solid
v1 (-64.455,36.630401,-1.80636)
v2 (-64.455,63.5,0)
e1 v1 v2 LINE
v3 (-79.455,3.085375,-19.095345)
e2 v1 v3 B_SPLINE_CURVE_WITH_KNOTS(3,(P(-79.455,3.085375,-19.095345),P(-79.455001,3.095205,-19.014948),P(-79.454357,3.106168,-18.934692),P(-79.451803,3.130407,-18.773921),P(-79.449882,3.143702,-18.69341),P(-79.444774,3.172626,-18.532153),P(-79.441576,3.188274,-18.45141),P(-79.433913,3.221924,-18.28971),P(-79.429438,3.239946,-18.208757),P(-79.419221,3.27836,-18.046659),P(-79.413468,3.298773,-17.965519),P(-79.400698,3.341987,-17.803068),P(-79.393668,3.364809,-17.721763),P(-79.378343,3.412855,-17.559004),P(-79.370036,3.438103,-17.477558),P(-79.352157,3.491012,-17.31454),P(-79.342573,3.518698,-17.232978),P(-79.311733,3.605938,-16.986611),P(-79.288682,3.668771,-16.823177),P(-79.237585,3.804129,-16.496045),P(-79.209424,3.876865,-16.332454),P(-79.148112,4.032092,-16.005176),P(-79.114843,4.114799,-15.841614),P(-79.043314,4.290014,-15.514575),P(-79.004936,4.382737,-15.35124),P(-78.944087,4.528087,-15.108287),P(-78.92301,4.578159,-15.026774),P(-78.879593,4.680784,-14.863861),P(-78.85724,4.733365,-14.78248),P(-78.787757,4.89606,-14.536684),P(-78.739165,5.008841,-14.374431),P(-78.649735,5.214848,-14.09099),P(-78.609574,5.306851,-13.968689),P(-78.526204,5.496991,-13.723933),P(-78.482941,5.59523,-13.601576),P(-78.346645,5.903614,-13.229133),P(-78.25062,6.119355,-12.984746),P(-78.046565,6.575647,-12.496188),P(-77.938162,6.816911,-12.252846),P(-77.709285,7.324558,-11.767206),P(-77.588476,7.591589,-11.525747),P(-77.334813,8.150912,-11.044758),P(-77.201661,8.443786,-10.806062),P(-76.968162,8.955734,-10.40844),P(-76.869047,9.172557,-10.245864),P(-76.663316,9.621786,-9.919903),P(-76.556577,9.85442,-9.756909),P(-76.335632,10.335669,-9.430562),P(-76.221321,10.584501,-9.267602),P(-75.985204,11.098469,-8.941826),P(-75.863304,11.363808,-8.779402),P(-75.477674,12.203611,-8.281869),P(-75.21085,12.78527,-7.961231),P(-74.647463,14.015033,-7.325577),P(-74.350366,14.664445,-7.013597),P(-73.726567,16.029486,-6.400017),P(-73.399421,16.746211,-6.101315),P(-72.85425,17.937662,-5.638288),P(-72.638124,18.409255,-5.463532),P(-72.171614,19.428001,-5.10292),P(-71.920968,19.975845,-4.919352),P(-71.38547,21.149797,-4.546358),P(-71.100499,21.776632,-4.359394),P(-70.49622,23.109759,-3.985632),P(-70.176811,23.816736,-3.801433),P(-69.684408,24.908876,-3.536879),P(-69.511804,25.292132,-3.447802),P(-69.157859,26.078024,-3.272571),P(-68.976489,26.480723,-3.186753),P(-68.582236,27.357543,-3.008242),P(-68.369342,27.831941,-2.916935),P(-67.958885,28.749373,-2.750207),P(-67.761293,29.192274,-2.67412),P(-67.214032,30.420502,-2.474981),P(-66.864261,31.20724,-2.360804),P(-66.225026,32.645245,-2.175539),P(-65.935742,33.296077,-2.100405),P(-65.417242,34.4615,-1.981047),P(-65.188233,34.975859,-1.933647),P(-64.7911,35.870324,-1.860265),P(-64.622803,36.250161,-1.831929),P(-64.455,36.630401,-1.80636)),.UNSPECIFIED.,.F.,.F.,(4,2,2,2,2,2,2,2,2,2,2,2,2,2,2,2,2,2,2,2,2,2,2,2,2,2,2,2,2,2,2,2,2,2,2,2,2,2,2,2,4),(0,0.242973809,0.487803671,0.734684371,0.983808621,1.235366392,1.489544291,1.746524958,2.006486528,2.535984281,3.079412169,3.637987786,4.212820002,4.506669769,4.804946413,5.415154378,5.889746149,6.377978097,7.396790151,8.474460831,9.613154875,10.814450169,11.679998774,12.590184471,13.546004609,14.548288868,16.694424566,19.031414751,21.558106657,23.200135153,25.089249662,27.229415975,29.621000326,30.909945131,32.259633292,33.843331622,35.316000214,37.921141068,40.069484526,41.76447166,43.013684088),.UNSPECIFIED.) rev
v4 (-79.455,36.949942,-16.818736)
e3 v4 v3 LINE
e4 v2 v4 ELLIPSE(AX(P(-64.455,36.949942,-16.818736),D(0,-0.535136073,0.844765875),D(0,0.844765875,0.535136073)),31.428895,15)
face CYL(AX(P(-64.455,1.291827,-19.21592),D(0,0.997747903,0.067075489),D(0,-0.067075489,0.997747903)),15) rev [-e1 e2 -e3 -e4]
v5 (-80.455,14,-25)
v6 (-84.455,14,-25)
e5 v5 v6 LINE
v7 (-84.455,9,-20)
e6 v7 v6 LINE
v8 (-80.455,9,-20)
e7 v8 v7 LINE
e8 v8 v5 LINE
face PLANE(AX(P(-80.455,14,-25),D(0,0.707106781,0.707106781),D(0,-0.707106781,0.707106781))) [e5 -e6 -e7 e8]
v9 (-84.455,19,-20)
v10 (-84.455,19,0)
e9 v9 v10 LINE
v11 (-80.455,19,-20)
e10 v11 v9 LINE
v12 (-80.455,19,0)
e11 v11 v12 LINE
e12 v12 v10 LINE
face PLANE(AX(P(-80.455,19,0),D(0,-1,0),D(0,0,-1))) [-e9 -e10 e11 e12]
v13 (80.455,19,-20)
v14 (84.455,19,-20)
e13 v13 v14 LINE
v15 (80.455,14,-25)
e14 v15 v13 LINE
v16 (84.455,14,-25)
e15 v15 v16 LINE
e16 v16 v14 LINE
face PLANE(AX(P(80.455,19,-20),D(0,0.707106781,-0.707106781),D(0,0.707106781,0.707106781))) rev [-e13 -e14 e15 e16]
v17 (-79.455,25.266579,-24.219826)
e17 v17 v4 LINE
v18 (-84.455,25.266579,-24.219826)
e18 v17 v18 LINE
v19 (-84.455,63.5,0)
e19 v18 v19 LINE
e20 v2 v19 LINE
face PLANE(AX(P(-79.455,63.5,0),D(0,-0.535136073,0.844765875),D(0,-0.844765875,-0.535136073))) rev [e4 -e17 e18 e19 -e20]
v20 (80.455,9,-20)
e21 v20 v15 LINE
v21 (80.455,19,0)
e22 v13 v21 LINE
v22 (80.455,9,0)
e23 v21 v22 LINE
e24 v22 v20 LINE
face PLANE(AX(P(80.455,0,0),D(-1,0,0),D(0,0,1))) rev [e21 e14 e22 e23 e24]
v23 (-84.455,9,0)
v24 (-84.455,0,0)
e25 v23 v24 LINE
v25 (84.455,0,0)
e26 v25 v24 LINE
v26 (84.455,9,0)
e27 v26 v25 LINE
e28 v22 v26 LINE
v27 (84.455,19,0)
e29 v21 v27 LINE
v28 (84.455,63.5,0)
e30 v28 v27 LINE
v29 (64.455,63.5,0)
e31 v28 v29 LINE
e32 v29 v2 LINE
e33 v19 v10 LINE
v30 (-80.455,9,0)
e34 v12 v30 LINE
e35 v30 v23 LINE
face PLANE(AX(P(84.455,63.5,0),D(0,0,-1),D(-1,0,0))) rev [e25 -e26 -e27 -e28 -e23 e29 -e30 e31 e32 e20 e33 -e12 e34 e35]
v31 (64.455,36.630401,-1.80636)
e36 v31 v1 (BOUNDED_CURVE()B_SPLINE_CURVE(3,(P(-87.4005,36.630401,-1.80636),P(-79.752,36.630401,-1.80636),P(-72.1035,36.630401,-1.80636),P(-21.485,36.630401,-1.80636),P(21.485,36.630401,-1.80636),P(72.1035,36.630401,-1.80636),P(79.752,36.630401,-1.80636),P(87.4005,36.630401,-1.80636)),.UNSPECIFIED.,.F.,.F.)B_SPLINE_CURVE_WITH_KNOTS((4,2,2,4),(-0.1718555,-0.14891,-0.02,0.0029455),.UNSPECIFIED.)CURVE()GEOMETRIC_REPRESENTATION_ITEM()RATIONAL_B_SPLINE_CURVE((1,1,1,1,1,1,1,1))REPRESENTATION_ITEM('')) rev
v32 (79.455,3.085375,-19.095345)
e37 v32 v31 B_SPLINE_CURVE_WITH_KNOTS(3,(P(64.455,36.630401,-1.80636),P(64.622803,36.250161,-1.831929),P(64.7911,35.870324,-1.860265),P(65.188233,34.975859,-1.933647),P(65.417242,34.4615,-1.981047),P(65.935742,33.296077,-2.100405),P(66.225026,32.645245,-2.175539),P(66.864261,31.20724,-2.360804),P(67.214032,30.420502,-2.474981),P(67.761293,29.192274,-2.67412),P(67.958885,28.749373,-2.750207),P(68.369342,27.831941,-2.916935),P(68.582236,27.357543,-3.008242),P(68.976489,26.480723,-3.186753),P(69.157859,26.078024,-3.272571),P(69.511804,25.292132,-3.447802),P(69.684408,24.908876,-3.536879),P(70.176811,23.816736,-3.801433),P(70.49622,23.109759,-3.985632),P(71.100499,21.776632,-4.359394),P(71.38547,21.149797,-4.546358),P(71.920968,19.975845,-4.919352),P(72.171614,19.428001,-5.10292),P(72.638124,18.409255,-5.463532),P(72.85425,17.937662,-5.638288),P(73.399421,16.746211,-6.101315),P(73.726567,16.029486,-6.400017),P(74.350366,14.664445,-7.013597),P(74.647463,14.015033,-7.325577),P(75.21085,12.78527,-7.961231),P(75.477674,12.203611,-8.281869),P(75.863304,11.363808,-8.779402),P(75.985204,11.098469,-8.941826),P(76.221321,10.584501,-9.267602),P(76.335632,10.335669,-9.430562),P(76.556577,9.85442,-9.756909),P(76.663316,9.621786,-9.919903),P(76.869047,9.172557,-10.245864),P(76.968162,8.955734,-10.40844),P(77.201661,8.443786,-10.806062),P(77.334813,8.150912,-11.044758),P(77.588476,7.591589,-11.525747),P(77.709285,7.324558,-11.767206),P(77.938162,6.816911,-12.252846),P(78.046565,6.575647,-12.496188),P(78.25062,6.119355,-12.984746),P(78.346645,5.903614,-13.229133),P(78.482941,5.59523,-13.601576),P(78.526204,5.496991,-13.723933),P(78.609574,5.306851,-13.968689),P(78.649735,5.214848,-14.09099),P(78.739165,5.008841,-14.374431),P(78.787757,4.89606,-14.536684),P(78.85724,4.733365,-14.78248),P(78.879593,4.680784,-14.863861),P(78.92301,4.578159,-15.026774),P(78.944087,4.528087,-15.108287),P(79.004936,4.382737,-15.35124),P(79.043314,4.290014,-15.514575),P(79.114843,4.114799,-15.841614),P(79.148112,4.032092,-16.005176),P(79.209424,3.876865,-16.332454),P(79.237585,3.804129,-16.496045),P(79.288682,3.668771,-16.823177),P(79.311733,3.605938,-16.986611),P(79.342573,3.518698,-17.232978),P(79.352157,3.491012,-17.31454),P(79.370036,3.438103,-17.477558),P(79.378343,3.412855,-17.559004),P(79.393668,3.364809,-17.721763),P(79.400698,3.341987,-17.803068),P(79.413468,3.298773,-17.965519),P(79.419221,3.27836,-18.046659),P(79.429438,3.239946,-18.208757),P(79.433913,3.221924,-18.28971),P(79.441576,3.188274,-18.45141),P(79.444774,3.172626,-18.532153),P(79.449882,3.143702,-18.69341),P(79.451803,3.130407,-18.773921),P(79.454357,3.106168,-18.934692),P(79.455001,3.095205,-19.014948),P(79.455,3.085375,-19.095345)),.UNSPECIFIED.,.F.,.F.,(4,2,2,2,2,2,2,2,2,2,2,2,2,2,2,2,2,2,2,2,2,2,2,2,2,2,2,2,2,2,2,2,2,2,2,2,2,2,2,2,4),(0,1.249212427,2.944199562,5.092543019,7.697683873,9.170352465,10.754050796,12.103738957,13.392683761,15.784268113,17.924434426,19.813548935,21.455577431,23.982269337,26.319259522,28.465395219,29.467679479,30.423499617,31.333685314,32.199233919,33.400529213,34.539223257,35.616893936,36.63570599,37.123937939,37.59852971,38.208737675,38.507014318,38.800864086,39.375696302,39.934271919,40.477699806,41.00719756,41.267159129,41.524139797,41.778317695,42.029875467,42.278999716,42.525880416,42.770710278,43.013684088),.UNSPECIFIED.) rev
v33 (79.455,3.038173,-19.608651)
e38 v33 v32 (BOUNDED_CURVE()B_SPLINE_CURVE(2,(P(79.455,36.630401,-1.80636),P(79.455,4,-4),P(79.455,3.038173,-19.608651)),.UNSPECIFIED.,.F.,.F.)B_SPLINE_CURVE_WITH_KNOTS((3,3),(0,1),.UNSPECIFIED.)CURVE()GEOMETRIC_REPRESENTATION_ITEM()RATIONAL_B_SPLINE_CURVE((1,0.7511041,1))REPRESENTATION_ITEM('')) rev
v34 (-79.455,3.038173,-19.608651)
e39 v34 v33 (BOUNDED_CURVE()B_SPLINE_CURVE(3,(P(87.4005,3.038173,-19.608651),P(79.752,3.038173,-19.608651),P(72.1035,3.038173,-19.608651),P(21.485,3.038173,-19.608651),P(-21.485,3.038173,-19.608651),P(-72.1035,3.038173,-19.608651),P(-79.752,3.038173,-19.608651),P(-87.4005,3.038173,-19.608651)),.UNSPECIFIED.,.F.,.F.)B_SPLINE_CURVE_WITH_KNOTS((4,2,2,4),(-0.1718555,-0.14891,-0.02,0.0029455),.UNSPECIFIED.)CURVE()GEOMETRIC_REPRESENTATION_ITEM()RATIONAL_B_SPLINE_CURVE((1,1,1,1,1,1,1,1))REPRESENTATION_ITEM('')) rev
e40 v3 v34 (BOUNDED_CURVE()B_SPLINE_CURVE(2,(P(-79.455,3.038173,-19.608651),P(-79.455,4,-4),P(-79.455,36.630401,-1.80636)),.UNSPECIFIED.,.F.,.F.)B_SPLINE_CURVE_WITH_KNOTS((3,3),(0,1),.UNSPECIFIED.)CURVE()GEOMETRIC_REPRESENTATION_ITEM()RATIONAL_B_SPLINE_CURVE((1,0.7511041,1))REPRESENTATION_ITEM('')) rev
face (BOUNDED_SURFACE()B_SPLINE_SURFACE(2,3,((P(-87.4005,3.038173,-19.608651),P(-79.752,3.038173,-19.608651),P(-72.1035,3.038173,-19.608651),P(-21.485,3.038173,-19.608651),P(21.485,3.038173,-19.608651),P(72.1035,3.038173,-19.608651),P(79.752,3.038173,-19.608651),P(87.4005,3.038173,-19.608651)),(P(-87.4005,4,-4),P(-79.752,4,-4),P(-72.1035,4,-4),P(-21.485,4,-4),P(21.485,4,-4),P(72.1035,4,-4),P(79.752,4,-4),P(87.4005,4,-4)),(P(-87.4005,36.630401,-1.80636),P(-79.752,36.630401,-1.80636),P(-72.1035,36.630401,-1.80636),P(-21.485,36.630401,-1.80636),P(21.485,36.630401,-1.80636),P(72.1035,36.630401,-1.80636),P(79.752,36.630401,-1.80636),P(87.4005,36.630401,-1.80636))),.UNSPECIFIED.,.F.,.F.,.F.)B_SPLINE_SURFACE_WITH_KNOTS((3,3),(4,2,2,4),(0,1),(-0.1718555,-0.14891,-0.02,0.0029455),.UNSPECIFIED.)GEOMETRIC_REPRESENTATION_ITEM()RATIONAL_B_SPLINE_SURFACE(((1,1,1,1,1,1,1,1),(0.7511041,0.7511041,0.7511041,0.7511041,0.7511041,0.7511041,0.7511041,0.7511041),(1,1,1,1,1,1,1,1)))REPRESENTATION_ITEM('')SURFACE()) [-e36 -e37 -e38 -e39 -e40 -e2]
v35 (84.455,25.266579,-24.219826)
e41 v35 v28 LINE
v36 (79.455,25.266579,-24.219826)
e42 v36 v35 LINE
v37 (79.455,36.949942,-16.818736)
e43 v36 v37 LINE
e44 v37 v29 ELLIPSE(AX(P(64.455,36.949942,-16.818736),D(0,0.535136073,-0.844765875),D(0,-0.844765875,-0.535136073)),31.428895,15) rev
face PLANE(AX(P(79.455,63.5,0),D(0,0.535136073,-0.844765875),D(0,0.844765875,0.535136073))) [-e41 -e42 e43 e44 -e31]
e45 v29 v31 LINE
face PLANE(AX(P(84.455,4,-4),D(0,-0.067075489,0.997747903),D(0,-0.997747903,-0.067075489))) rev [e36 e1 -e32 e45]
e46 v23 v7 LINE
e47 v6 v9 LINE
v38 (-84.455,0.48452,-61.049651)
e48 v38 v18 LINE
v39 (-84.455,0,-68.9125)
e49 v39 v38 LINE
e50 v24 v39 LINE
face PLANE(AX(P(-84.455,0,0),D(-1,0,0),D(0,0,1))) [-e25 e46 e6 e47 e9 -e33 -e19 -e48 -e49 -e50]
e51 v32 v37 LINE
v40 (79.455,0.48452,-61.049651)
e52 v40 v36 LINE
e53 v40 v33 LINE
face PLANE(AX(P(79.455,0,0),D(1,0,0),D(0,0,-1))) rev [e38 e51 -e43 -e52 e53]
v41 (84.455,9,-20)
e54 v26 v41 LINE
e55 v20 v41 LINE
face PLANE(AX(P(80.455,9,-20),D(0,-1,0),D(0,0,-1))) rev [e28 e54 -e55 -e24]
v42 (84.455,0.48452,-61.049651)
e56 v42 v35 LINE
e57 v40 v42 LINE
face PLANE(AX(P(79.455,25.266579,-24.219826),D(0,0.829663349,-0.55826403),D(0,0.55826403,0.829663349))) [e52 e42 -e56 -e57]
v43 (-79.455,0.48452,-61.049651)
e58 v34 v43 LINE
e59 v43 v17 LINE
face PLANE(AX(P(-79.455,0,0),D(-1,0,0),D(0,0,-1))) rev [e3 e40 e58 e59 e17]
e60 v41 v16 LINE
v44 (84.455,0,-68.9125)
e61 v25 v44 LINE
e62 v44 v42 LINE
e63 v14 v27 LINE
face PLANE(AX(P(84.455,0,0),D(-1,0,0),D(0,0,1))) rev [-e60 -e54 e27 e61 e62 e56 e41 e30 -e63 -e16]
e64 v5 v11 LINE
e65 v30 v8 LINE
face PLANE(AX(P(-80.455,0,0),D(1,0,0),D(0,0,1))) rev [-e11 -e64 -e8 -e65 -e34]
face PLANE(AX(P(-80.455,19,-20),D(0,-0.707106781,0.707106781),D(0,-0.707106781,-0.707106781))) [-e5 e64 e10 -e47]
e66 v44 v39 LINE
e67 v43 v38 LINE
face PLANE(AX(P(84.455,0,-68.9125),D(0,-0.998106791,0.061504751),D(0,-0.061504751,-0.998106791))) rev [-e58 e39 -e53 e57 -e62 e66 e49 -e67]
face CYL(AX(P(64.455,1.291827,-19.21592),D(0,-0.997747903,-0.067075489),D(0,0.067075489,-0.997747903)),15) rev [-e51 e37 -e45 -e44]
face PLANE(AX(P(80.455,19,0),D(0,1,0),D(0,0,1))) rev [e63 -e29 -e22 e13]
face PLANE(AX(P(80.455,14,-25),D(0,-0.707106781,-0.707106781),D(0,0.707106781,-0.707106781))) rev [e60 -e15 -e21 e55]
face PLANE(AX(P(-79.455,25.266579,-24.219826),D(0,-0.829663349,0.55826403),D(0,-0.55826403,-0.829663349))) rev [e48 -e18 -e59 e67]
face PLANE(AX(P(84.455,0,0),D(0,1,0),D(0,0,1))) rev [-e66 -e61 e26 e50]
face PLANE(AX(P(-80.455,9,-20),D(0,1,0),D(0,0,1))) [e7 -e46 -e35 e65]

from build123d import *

# Parameters (mm, degrees)
BOSS_EXTRUDE1_DEPTH  = 84.455
BOSS_EXTRUDE2_DEPTH  = 5
FILLET2_R            = 15
CUT_EXTRUDE1_DEPTH   = 4
FILLET2_OF_MIRROR1_R = 15
FILLET1_START        = -79.455
FILLET1_DEPTH        = 158.91


with BuildPart() as part:
    # Sketch1 → Boss-Extrude1 (new, symmetric)
    with BuildSketch(Plane(origin=(0, 0, 0), x_dir=(0, 0, -1), z_dir=(1, 0, 0))):
        Polygon((0, 63.5), (0, 0), (68.9125, 0), (4, 4), align=None)
    extrude(amount=BOSS_EXTRUDE1_DEPTH, both=True)

    # Sketch2 → Boss-Extrude2 (add)
    with BuildSketch(Plane(origin=(84.455, 0, 0), x_dir=(0, 0, -1), z_dir=(1, 0, 0))):
        Polygon((0, 63.5), (24.219826303, 25.26657899), (61.769719172, 0), (0, 0), align=None)
    boss_extrude2 = extrude(amount=-BOSS_EXTRUDE2_DEPTH)

    # Fillet2
    fillet2_edges = [part.edges().sort_by_distance(p)[0] for p in [
        (79.455, 33.75, -2),
    ]]
    fillet(fillet2_edges, radius=FILLET2_R)

    # Sketch4 → Cut-Extrude1 (cut)
    with BuildSketch(Plane(origin=(84.455, 0, 0), x_dir=(0, 0, -1), z_dir=(1, 0, 0))):
        Polygon((0, 19), (20, 19), (25, 14), (20, 9), (0, 9), align=None)
    cut_extrude1 = extrude(amount=-CUT_EXTRUDE1_DEPTH, mode=Mode.SUBTRACT)

    # Mirror1: Boss-Extrude2, Cut-Extrude1 across plane
    add(boss_extrude2.mirror(Plane(origin=(0, 0, 0), x_dir=(0, 0, 1), z_dir=(1, 0, 0))))
    add(cut_extrude1.mirror(Plane(origin=(0, 0, 0), x_dir=(0, 0, 1), z_dir=(1, 0, 0))), mode=Mode.SUBTRACT)

    # Fillet2 of Mirror1
    fillet2_of_mirror1_edges = [part.edges().sort_by_distance(p)[0] for p in [
        (-79.455, 33.75, -2),
    ]]
    fillet(fillet2_of_mirror1_edges, radius=FILLET2_OF_MIRROR1_R)

    # Fillet1: read off the stored shape, not the designer's step
    # Fillet1 outline → Fillet1 (add)
    with BuildSketch(Plane.YZ.offset(FILLET1_START)):
        with BuildLine():
            Line((4, -4), (3.038172839, -19.608651391))
            add(Edge.make_bspline(
                [(3.038172839, -19.608651391), (4, -4), (36.630400727, -1.806359615)],
                knots=[0, 0, 0, 1, 1, 1], degree=2, weights=[1, 0.7511041, 1]))
            Line((36.630400727, -1.806359615), (4, -4))
        make_face()
    extrude(amount=FILLET1_DEPTH)


solid = part.part
